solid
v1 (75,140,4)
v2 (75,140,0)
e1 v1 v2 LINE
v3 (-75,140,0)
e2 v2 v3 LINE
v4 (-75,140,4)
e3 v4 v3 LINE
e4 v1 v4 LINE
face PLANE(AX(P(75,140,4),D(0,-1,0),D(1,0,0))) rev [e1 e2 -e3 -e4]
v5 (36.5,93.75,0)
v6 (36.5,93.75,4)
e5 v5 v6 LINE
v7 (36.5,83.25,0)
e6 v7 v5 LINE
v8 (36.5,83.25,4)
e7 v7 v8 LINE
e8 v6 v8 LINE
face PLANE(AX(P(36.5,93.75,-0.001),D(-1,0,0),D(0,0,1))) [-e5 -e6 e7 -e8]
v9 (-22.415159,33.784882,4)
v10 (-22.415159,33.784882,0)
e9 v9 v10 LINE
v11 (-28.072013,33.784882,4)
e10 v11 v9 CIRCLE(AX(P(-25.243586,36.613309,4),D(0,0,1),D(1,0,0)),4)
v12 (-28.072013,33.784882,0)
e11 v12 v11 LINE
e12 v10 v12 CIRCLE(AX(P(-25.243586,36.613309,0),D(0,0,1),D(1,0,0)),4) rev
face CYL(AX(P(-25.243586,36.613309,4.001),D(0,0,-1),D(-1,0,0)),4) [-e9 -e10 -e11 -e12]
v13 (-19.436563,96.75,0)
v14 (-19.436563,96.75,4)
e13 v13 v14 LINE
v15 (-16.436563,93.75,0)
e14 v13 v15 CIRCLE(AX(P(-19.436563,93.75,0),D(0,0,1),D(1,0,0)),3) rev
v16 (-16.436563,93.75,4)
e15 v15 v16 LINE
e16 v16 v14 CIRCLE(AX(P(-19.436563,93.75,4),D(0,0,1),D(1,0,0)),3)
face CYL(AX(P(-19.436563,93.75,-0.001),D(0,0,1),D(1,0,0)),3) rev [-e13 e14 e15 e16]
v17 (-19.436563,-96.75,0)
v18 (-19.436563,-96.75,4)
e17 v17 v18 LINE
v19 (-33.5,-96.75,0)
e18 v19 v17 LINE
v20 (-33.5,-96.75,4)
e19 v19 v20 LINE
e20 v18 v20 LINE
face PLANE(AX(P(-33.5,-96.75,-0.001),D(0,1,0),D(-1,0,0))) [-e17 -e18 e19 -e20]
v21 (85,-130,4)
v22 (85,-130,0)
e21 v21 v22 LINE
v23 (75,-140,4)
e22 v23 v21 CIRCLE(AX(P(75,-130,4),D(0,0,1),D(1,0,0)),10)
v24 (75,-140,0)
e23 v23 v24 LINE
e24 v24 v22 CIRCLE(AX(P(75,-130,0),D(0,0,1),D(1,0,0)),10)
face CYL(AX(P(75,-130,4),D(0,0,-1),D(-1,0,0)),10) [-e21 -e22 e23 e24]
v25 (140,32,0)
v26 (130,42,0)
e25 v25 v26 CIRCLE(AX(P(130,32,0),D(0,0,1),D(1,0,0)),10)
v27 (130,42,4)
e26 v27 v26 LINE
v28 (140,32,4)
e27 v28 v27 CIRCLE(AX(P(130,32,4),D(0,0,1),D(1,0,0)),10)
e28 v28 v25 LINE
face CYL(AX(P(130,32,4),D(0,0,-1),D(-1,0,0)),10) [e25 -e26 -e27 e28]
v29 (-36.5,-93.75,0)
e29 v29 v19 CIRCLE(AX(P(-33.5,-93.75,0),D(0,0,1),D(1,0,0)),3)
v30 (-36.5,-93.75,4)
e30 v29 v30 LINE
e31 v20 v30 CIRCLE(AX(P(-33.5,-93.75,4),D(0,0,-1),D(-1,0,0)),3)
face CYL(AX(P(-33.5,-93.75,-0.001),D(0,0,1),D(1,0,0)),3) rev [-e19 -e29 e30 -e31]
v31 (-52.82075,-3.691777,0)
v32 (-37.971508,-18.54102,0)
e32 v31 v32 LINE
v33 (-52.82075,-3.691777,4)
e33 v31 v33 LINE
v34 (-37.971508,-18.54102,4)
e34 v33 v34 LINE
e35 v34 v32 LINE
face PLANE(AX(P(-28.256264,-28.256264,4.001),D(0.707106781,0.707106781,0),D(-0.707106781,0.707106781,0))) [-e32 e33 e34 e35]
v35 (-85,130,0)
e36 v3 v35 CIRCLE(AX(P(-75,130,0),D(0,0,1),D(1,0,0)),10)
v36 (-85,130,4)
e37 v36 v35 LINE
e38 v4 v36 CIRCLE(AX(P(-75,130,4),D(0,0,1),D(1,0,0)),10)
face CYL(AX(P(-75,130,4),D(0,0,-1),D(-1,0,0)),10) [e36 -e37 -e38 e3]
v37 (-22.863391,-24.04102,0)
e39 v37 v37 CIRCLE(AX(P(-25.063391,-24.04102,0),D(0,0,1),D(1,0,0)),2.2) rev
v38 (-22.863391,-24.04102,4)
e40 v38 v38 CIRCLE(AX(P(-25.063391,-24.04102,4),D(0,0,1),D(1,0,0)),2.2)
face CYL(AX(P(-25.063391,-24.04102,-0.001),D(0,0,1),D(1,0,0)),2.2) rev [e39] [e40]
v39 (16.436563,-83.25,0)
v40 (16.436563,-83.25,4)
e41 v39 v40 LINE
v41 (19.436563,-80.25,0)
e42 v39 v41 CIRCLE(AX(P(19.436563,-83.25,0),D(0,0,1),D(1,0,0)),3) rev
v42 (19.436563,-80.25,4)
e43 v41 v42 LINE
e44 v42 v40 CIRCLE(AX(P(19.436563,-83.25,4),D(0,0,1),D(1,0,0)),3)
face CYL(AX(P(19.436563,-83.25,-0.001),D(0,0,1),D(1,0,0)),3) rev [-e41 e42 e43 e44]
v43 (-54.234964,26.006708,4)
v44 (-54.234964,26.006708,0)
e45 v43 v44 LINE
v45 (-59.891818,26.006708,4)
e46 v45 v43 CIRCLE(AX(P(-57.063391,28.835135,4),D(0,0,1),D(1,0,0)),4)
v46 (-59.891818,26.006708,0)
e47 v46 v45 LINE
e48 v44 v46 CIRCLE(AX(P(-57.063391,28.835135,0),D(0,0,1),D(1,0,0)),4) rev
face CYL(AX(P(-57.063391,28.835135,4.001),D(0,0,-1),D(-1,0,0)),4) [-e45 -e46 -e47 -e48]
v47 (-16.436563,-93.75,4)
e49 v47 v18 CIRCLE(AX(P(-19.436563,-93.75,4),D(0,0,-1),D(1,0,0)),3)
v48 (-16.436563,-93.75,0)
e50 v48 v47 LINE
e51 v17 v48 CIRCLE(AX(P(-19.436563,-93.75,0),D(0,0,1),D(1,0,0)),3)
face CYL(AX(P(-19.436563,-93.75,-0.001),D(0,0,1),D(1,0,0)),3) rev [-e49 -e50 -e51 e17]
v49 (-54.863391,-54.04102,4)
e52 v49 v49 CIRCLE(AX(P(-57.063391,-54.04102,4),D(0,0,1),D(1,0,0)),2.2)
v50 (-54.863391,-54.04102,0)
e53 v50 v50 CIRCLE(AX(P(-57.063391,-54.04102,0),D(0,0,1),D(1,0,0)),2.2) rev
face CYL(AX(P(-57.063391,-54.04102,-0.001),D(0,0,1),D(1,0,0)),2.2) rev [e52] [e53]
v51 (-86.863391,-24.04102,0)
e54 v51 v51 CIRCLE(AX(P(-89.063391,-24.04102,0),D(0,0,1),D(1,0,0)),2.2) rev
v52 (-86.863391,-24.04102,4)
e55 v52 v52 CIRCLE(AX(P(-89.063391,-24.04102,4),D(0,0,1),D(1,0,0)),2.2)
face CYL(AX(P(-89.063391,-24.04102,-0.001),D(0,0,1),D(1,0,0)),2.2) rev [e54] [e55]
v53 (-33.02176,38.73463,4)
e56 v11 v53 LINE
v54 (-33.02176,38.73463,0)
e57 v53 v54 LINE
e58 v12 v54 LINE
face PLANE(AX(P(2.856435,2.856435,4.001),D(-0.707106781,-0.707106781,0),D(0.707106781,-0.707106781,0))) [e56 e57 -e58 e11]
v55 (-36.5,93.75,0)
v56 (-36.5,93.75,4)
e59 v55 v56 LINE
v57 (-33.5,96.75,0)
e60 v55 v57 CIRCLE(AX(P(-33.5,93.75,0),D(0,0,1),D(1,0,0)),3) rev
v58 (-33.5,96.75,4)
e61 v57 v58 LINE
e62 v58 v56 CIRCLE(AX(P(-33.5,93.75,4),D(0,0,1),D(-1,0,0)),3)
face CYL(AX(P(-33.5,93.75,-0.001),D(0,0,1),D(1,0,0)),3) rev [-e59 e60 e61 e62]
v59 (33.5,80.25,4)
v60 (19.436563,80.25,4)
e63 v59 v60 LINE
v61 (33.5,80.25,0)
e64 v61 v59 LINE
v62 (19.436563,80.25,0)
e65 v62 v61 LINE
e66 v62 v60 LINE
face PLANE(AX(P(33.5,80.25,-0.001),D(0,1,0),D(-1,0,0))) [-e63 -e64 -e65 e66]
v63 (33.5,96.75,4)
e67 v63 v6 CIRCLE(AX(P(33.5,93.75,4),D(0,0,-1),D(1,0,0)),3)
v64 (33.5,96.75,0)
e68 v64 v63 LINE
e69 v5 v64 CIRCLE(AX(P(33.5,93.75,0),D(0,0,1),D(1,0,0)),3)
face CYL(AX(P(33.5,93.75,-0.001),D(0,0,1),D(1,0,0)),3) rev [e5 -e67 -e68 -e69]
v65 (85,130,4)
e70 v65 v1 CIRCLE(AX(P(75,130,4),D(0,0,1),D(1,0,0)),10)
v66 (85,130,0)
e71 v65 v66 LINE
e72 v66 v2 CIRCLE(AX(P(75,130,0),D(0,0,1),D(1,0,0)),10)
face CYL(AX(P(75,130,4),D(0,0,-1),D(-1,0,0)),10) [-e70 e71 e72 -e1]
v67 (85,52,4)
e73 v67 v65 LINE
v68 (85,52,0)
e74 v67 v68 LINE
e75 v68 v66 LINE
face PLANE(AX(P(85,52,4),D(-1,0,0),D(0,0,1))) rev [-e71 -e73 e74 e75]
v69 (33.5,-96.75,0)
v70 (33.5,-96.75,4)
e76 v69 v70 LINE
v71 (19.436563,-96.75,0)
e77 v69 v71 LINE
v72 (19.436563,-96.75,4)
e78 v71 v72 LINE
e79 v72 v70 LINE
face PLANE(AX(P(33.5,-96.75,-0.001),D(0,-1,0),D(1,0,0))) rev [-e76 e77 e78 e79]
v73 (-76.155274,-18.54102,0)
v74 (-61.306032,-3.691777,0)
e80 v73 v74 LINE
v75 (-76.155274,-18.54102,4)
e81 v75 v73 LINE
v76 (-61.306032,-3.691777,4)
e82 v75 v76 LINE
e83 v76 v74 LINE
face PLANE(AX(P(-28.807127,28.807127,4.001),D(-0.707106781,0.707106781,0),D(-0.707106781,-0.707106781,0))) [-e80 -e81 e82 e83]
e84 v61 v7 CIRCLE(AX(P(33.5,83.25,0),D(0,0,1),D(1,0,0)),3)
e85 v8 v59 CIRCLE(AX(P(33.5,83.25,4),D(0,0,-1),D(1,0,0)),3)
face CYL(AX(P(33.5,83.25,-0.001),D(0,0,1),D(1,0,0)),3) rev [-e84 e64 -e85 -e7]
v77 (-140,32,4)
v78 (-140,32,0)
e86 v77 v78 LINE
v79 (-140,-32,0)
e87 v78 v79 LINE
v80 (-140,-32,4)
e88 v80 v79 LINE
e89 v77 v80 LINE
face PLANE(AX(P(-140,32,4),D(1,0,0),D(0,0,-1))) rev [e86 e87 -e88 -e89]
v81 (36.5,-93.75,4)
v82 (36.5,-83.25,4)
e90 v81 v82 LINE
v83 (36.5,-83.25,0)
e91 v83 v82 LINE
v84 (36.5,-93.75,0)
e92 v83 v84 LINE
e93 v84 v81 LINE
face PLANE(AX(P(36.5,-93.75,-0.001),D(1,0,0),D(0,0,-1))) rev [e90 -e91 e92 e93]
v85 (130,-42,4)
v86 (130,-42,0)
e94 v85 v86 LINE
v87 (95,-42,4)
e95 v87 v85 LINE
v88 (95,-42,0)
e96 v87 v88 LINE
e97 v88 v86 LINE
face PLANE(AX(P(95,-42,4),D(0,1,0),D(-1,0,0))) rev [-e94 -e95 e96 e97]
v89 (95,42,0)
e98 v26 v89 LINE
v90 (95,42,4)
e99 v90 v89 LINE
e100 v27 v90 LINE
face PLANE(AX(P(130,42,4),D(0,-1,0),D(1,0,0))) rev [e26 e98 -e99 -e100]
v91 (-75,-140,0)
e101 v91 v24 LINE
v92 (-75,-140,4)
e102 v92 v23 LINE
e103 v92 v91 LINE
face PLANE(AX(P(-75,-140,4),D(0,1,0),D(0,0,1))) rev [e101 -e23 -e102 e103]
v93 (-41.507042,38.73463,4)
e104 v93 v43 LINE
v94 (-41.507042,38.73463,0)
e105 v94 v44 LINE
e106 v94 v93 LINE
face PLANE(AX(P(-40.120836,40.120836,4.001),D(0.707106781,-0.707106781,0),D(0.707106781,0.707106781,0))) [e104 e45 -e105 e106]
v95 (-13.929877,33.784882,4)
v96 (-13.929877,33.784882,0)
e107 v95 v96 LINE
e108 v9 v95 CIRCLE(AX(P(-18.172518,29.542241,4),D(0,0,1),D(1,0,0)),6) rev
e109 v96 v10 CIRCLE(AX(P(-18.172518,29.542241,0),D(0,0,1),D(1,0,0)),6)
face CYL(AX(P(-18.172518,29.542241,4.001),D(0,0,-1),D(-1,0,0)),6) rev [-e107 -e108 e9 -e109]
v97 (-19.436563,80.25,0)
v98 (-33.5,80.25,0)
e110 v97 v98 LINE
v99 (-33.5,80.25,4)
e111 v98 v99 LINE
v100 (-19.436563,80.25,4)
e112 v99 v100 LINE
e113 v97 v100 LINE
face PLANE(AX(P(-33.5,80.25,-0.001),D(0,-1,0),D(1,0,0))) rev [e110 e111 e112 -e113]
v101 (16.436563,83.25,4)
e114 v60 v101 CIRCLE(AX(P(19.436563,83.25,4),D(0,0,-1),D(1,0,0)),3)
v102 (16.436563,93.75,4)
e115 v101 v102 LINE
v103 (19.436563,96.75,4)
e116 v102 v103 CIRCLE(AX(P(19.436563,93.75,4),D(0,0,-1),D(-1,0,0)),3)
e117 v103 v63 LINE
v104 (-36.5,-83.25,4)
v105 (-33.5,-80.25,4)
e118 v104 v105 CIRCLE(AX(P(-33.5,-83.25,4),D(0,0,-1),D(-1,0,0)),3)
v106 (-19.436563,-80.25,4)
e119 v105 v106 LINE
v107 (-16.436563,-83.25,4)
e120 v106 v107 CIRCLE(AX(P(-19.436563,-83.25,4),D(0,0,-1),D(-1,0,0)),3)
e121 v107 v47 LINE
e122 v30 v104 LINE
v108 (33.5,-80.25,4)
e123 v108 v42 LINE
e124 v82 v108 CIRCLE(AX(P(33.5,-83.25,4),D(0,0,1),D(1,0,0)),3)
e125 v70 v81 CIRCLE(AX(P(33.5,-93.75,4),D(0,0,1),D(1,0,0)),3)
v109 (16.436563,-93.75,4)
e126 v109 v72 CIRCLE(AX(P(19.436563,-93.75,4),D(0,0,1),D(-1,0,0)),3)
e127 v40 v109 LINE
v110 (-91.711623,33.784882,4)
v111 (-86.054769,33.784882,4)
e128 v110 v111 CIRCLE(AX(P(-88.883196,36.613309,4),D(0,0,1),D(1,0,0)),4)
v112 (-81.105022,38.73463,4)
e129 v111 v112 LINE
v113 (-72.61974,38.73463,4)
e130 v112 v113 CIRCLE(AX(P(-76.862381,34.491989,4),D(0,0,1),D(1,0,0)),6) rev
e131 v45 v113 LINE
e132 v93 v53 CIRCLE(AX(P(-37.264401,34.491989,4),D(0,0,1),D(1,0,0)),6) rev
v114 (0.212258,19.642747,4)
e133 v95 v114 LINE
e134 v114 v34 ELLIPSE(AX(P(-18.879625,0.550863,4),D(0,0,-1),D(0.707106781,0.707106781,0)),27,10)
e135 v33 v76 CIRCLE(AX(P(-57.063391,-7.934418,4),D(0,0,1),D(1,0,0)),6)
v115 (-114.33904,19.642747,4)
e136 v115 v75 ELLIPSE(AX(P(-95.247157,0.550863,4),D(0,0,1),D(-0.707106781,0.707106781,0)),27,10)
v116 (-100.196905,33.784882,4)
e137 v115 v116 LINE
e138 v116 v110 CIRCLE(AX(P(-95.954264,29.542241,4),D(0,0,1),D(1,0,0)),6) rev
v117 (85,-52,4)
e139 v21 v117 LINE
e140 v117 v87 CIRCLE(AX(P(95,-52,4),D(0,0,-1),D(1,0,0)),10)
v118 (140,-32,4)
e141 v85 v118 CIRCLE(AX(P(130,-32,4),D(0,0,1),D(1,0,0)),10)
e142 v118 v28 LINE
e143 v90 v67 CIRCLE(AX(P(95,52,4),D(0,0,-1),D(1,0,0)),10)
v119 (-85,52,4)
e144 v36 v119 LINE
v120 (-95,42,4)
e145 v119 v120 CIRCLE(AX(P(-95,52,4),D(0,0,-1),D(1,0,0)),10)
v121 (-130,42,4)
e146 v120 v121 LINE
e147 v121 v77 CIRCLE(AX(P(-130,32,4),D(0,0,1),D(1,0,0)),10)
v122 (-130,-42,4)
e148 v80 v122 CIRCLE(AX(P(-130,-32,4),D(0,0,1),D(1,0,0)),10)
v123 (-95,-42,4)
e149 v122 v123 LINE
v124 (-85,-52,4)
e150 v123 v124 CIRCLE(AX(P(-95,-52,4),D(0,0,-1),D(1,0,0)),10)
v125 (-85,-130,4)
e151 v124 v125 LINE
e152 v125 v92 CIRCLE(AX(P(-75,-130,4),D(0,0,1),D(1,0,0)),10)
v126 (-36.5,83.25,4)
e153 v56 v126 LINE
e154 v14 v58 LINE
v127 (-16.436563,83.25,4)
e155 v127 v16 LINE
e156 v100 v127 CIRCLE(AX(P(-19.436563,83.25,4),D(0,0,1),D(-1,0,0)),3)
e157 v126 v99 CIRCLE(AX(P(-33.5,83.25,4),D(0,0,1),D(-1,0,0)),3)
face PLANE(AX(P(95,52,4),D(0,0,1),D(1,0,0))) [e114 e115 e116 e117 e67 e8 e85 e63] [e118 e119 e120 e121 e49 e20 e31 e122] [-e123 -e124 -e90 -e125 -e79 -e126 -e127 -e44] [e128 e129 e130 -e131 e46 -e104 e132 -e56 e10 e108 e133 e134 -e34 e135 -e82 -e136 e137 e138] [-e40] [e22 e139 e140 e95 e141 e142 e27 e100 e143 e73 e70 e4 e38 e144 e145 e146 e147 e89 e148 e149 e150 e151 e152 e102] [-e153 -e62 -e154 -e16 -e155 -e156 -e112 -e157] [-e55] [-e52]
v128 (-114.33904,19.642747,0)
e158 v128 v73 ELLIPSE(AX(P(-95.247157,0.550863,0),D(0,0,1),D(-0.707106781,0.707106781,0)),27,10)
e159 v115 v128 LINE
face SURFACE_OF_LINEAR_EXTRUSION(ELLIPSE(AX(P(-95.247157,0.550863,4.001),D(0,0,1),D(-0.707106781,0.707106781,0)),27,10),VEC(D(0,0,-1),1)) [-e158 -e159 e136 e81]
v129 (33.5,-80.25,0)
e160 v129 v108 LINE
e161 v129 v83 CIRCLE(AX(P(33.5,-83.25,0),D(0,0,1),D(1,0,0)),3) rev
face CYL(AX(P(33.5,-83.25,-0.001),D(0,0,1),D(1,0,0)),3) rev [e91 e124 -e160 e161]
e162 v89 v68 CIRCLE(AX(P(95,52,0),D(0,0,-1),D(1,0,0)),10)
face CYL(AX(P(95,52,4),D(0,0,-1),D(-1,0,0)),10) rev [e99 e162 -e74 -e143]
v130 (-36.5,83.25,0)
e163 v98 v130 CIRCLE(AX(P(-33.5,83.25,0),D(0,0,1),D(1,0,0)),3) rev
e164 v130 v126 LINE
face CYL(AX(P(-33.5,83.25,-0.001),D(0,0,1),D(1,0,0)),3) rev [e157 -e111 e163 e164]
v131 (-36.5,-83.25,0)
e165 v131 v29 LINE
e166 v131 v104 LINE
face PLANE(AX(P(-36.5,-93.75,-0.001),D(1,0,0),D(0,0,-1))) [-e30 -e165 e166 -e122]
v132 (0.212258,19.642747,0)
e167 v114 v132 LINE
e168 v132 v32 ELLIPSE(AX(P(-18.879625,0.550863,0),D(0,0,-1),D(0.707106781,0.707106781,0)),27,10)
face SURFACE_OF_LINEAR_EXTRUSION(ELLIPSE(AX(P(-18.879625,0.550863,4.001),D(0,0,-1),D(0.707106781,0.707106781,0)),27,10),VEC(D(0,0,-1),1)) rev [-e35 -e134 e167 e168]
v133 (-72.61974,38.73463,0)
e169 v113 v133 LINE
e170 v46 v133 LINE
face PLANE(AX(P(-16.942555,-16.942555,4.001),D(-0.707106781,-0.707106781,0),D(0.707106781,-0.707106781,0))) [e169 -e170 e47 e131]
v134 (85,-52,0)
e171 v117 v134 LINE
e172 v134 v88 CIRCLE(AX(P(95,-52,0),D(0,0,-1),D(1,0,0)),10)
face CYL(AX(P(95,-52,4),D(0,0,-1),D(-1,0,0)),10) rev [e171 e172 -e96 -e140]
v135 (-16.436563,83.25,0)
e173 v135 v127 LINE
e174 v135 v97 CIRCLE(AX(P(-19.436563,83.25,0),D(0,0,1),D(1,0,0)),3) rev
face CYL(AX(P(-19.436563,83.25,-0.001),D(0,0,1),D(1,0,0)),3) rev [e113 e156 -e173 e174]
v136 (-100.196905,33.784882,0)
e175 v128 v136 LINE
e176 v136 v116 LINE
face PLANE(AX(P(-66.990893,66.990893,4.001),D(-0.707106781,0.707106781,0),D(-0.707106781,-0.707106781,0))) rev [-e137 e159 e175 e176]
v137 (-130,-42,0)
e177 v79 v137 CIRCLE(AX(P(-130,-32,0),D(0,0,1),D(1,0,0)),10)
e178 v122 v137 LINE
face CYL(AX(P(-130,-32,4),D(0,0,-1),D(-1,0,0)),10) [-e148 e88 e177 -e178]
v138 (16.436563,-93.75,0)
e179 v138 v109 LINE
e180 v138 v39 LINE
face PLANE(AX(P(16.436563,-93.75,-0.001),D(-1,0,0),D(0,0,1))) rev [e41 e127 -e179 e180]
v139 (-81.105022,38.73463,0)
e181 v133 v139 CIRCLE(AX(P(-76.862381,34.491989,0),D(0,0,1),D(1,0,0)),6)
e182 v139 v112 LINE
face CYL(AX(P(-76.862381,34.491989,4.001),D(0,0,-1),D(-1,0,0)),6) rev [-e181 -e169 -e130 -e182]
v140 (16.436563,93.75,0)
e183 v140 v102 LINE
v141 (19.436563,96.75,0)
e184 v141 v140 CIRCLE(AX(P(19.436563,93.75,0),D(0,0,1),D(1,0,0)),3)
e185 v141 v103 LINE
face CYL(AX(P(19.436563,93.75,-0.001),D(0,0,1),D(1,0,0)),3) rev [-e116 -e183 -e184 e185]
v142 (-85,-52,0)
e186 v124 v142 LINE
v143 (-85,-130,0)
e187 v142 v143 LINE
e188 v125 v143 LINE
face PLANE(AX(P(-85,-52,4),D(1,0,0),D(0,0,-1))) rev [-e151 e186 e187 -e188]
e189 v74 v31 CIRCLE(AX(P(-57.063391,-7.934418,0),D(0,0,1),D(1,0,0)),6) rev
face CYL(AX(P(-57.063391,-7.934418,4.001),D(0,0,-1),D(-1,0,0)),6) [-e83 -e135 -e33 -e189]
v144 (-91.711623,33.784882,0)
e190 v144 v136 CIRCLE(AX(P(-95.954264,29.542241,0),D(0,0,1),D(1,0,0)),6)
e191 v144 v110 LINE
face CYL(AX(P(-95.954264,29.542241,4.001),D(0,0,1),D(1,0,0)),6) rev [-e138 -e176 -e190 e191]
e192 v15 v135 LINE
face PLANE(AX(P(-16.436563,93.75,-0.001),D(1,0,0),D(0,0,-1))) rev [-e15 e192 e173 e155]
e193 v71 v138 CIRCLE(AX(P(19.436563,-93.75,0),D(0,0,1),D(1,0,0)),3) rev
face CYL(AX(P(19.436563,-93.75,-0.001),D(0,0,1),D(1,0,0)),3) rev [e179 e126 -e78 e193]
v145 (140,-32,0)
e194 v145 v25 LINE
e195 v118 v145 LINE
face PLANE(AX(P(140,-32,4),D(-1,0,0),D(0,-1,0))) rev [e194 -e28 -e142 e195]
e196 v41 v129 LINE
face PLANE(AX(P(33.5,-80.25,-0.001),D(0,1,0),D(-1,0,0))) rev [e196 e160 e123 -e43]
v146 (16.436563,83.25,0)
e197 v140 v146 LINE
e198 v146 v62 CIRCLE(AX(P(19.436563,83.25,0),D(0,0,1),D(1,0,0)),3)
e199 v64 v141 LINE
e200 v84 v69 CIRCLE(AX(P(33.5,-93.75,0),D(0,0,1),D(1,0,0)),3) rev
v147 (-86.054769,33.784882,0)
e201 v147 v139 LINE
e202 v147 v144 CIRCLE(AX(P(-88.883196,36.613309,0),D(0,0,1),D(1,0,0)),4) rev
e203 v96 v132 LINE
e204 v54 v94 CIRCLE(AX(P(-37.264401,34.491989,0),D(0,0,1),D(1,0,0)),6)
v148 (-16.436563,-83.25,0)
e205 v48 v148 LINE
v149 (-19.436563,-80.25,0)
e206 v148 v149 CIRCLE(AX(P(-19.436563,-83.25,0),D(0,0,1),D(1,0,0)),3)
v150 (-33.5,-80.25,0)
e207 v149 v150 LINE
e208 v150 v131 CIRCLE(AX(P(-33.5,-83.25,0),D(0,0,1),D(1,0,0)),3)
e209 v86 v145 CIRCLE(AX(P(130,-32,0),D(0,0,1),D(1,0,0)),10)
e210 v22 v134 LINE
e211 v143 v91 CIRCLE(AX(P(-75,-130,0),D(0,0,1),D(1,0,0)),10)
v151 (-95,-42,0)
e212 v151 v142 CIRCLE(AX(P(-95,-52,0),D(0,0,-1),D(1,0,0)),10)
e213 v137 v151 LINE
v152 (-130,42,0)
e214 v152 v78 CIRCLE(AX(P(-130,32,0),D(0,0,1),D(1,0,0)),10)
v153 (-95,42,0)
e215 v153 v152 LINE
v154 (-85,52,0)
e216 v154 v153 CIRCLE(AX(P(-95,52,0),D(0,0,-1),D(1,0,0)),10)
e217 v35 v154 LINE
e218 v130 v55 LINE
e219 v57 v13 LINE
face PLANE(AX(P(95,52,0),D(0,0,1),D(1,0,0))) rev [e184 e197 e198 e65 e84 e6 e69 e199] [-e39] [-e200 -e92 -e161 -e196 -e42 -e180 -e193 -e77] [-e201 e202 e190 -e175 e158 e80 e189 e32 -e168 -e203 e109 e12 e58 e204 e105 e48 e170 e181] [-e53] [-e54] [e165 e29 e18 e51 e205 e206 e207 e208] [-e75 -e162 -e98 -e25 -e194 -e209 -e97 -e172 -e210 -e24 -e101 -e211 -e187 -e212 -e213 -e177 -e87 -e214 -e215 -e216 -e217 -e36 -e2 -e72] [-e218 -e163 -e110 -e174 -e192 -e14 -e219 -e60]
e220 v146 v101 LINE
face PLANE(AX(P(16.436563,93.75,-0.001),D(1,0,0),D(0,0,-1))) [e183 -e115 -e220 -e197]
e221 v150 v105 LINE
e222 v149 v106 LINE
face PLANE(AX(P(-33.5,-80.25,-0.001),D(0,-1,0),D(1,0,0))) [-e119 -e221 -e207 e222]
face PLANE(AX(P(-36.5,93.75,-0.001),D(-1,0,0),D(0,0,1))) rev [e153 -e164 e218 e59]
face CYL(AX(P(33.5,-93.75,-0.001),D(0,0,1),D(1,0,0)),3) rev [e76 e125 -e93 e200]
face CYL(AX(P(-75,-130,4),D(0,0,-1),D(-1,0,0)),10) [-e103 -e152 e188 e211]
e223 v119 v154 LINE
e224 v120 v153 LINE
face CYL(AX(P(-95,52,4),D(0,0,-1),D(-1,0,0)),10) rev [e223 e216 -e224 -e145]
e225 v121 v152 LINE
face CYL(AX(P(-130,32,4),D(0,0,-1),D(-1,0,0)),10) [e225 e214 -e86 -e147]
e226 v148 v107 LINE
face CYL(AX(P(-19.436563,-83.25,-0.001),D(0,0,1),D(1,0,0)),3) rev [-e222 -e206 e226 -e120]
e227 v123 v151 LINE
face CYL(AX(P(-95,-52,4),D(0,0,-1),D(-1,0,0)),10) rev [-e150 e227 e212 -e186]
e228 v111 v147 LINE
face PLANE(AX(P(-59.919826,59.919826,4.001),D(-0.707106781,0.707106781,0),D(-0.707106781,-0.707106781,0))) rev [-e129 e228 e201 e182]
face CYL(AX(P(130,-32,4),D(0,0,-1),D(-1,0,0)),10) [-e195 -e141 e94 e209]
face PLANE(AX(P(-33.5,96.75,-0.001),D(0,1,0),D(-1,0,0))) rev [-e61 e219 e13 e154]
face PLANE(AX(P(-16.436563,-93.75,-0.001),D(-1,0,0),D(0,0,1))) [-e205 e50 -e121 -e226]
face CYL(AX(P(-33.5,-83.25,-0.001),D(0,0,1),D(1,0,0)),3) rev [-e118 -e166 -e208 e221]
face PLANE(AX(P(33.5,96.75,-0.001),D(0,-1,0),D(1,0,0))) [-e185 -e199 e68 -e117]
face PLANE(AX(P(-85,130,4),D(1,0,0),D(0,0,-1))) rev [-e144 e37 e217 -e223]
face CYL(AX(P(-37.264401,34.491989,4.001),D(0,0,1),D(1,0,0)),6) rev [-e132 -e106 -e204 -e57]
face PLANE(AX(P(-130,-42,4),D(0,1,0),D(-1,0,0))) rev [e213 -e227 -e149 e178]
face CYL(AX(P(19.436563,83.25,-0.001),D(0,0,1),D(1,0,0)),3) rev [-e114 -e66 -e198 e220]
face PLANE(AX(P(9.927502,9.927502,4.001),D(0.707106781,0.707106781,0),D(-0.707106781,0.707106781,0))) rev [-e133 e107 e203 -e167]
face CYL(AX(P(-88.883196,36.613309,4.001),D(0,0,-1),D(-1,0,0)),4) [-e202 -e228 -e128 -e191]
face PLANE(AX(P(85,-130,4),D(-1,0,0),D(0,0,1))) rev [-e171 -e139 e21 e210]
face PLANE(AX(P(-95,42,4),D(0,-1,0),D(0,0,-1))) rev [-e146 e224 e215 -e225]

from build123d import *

# Parameters (mm, degrees)
EXTRUDE_1_DEPTH                           = 4
CUT_EXTRUDE_1_REACH                       = 200.03
MIRROR_1_AT_THE_SECOND_PLANE_COPY_1_REACH = 200.03
CUT_EXTRUDE_2_REACH                       = 200.03
FILLET_1_R                                = 4
FILLET_2_R                                = 6
CUT_EXTRUDE_3_REACH                       = 200.03
SKETCH_7_R                                = 2.2


with BuildPart() as part:
    # 草图1 → 凸台-拉伸1 (new body)
    with BuildSketch(Plane.XY):
        with BuildLine():
            Line((85, 52), (85, 130))
            ThreePointArc((85, 130), (82.071067812, 137.071067812), (75, 140))
            Line((75, 140), (-75, 140))
            ThreePointArc((-75, 140), (-82.071067812, 137.071067812), (-85, 130))
            Line((-85, 130), (-85, 52))
            ThreePointArc((-85, 52), (-87.928932188, 44.928932188), (-95, 42))
            Line((-95, 42), (-130, 42))
            ThreePointArc((-130, 42), (-137.071067812, 39.071067812), (-140, 32))
            Line((-140, 32), (-140, -32))
            ThreePointArc((-140, -32), (-137.071067812, -39.071067812), (-130, -42))
            Line((-130, -42), (-95, -42))
            ThreePointArc((-95, -42), (-87.928932188, -44.928932188), (-85, -52))
            Line((-85, -52), (-85, -130))
            ThreePointArc((-85, -130), (-82.071067812, -137.071067812), (-75, -140))
            Line((-75, -140), (75, -140))
            ThreePointArc((75, -140), (82.071067812, -137.071067812), (85, -130))
            Line((85, -130), (85, -52))
            ThreePointArc((85, -52), (87.928932188, -44.928932188), (95, -42))
            Line((95, -42), (130, -42))
            ThreePointArc((130, -42), (137.071067812, -39.071067812), (140, -32))
            Line((140, -32), (140, 32))
            ThreePointArc((140, 32), (137.071067812, 39.071067812), (130, 42))
            Line((130, 42), (95, 42))
            ThreePointArc((95, 42), (87.928932188, 44.928932188), (85, 52))
        make_face()
    extrude(amount=EXTRUDE_1_DEPTH)

    # 草图2 → 切除-拉伸1 (cut, up to next)
    with BuildSketch(Plane.XY.offset(4), mode=Mode.PRIVATE) as cut_extrude_1_sk1:
        with BuildLine():
            Line((33.5, -96.75), (19.436562746, -96.75))
            ThreePointArc((19.436562746, -96.75), (17.315242402, -95.871320344), (16.436562746, -93.75))
            Line((16.436562746, -93.75), (16.436562746, -83.25))
            ThreePointArc((16.436562746, -83.25), (17.315242402, -81.128679656), (19.436562746, -80.25))
            Line((19.436562746, -80.25), (33.5, -80.25))
            ThreePointArc((33.5, -80.25), (35.621320344, -81.128679656), (36.5, -83.25))
            Line((36.5, -83.25), (36.5, -93.75))
            ThreePointArc((36.5, -93.75), (35.621320344, -95.871320344), (33.5, -96.75))
        make_face()
    cut_extrude_1_tool1 = extrude(cut_extrude_1_sk1.sketch, amount=-CUT_EXTRUDE_1_REACH, mode=Mode.PRIVATE) & part.part
    cut_extrude_1 = cut_extrude_1_tool1.solids().sort_by_distance((26.468281, -88.5, 4))[0]
    add(cut_extrude_1, mode=Mode.SUBTRACT)

    # 镜向1: 切除-拉伸1 across plane
    add(cut_extrude_1.mirror(Plane(origin=(0, 0, 0), x_dir=(0, 0, 1), z_dir=(1, 0, 0))), mode=Mode.SUBTRACT)

    # 镜向1 at the second plane: 切除-拉伸1 across plane
    add(cut_extrude_1.mirror(Plane.ZX), mode=Mode.SUBTRACT)

    # 镜向1 at the second plane copy 1 sket → 镜向1 at the second plane copy 1 (cut, up to next)
    with BuildSketch(Plane(origin=(0, 0, 4), x_dir=(-1, 0, 0), z_dir=(0, 0, 1)), mode=Mode.PRIVATE) as mirror_1_at_the_second_plane_copy_1_sk1:
        with BuildLine():
            Line((33.5, -96.75), (19.436562746, -96.75))
            ThreePointArc((19.436562746, -96.75), (17.315242402, -95.871320344), (16.436562746, -93.75))
            Line((16.436562746, -93.75), (16.436562746, -83.25))
            ThreePointArc((16.436562746, -83.25), (17.315242402, -81.128679656), (19.436562746, -80.25))
            Line((19.436562746, -80.25), (33.5, -80.25))
            ThreePointArc((33.5, -80.25), (35.621320344, -81.128679656), (36.5, -83.25))
            Line((36.5, -83.25), (36.5, -93.75))
            ThreePointArc((36.5, -93.75), (35.621320344, -95.871320344), (33.5, -96.75))
        make_face()
    mirror_1_at_the_second_plane_copy_1_tool1 = extrude(mirror_1_at_the_second_plane_copy_1_sk1.sketch, amount=-MIRROR_1_AT_THE_SECOND_PLANE_COPY_1_REACH, mode=Mode.PRIVATE) & part.part
    add(mirror_1_at_the_second_plane_copy_1_tool1.solids().sort_by_distance((-26.468281, 88.5, 4))[0], mode=Mode.SUBTRACT)

    # 草图6 → 切除-拉伸2 (cut, up to next)
    with BuildSketch(Plane(origin=(0, 0, 0), x_dir=(-1, 0, 0), z_dir=(0, 0, -1)), mode=Mode.PRIVATE) as cut_extrude_2_sk1:
        with BuildLine():
            Line((114.339040254, 19.642746522), (95.954263943, 38.027522832))
            Line((95.954263943, 38.027522832), (88.883196131, 30.956455021))
            Line((88.883196131, 30.956455021), (76.862380851, 42.977270301))
            Line((76.862380851, 42.977270301), (57.063390978, 23.178280428))
            Line((57.063390978, 23.178280428), (37.264401104, 42.977270301))
            Line((37.264401104, 42.977270301), (25.243585824, 30.956455021))
            Line((25.243585824, 30.956455021), (18.172518012, 38.027522832))
            Line((18.172518012, 38.027522832), (-0.212258298, 19.642746522))
            add(Edge.make_bspline(
                [(37.971507886, -18.541019662), (45.042575698, -11.469951851), (25.950692606, 7.621931241), (6.858809513, 26.713814333), (-0.212258298, 19.642746522)],
                knots=[3.141592654, 3.141592654, 3.141592654, 4.71238898, 4.71238898, 6.283185307, 6.283185307, 6.283185307], degree=2, weights=[1, 0.707106781, 1, 0.707106781, 1]))
            Line((37.971507886, -18.541019662), (57.063390978, 0.55086343))
            Line((57.063390978, 0.55086343), (76.15527407, -18.541019662))
            add(Edge.make_bspline(
                [(114.339040254, 19.642746522), (107.267972442, 26.713814333), (88.17608935, 7.621931241), (69.084206258, -11.469951851), (76.15527407, -18.541019662)],
                knots=[0, 0, 0, 1.570796327, 1.570796327, 3.141592654, 3.141592654, 3.141592654], degree=2, weights=[1, 0.707106781, 1, 0.707106781, 1]))
        make_face()
    cut_extrude_2_tool1 = extrude(cut_extrude_2_sk1.sketch, amount=-CUT_EXTRUDE_2_REACH, mode=Mode.PRIVATE) & part.part
    # 草图6 → 切除-拉伸2 (cut, up to next)
    with BuildSketch(Plane(origin=(0, 0, 0), x_dir=(-1, 0, 0), z_dir=(0, 0, -1)), mode=Mode.PRIVATE) as cut_extrude_2_sk2:
        with BuildLine():
            add(Edge.make_bspline(
                [(-0.212258298, 19.642746522), (-7.28332611, 12.57167871), (11.808556982, -6.520204382), (30.900440074, -25.612087474), (37.971507886, -18.541019662)],
                knots=[0, 0, 0, 1.570796327, 1.570796327, 3.141592654, 3.141592654, 3.141592654], degree=2, weights=[1, 0.707106781, 1, 0.707106781, 1]))
            Line((37.971507886, -18.541019662), (-0.212258298, 19.642746522))
        make_face()
    cut_extrude_2_tool2 = extrude(cut_extrude_2_sk2.sketch, amount=-CUT_EXTRUDE_2_REACH, mode=Mode.PRIVATE) & part.part
    # 草图6 → 切除-拉伸2 (cut, up to next)
    with BuildSketch(Plane(origin=(0, 0, 0), x_dir=(-1, 0, 0), z_dir=(0, 0, -1)), mode=Mode.PRIVATE) as cut_extrude_2_sk3:
        with BuildLine():
            Line((-0.212258298, 19.642746522), (37.971507886, -18.541019662))
            add(Edge.make_bspline(
                [(37.971507886, -18.541019662), (45.042575698, -11.469951851), (25.950692606, 7.621931241), (6.858809513, 26.713814333), (-0.212258298, 19.642746522)],
                knots=[3.141592654, 3.141592654, 3.141592654, 4.71238898, 4.71238898, 6.283185307, 6.283185307, 6.283185307], degree=2, weights=[1, 0.707106781, 1, 0.707106781, 1]))
        make_face()
    cut_extrude_2_tool3 = extrude(cut_extrude_2_sk3.sketch, amount=-CUT_EXTRUDE_2_REACH, mode=Mode.PRIVATE) & part.part
    # 草图6 → 切除-拉伸2 (cut, up to next)
    with BuildSketch(Plane(origin=(0, 0, 0), x_dir=(-1, 0, 0), z_dir=(0, 0, -1)), mode=Mode.PRIVATE) as cut_extrude_2_sk4:
        with BuildLine():
            add(Edge.make_bspline(
                [(-0.212258298, 19.642746522), (-7.28332611, 12.57167871), (11.808556982, -6.520204382), (30.900440074, -25.612087474), (37.971507886, -18.541019662)],
                knots=[0, 0, 0, 1.570796327, 1.570796327, 3.141592654, 3.141592654, 3.141592654], degree=2, weights=[1, 0.707106781, 1, 0.707106781, 1]))
            Line((37.971507886, -18.541019662), (-0.212258298, 19.642746522))
        make_face()
    cut_extrude_2_tool4 = extrude(cut_extrude_2_sk4.sketch, amount=-CUT_EXTRUDE_2_REACH, mode=Mode.PRIVATE) & part.part
    # 草图6 → 切除-拉伸2 (cut, up to next)
    with BuildSketch(Plane(origin=(0, 0, 0), x_dir=(-1, 0, 0), z_dir=(0, 0, -1)), mode=Mode.PRIVATE) as cut_extrude_2_sk5:
        with BuildLine():
            Line((-0.212258298, 19.642746522), (37.971507886, -18.541019662))
            add(Edge.make_bspline(
                [(37.971507886, -18.541019662), (45.042575698, -11.469951851), (25.950692606, 7.621931241), (6.858809513, 26.713814333), (-0.212258298, 19.642746522)],
                knots=[3.141592654, 3.141592654, 3.141592654, 4.71238898, 4.71238898, 6.283185307, 6.283185307, 6.283185307], degree=2, weights=[1, 0.707106781, 1, 0.707106781, 1]))
        make_face()
    cut_extrude_2_tool5 = extrude(cut_extrude_2_sk5.sketch, amount=-CUT_EXTRUDE_2_REACH, mode=Mode.PRIVATE) & part.part
    # 草图6 → 切除-拉伸2 (cut, up to next)
    with BuildSketch(Plane(origin=(0, 0, 0), x_dir=(-1, 0, 0), z_dir=(0, 0, -1)), mode=Mode.PRIVATE) as cut_extrude_2_sk6:
        with BuildLine():
            add(Edge.make_bspline(
                [(76.15527407, -18.541019662), (83.226341882, -25.612087474), (102.318224974, -6.520204382), (121.410108066, 12.57167871), (114.339040254, 19.642746522)],
                knots=[3.141592654, 3.141592654, 3.141592654, 4.71238898, 4.71238898, 6.283185307, 6.283185307, 6.283185307], degree=2, weights=[1, 0.707106781, 1, 0.707106781, 1]))
            Line((114.339040254, 19.642746522), (76.15527407, -18.541019662))
        make_face()
    cut_extrude_2_tool6 = extrude(cut_extrude_2_sk6.sketch, amount=-CUT_EXTRUDE_2_REACH, mode=Mode.PRIVATE) & part.part
    # 草图6 → 切除-拉伸2 (cut, up to next)
    with BuildSketch(Plane(origin=(0, 0, 0), x_dir=(-1, 0, 0), z_dir=(0, 0, -1)), mode=Mode.PRIVATE) as cut_extrude_2_sk7:
        with BuildLine():
            Line((76.15527407, -18.541019662), (114.339040254, 19.642746522))
            add(Edge.make_bspline(
                [(114.339040254, 19.642746522), (107.267972442, 26.713814333), (88.17608935, 7.621931241), (69.084206258, -11.469951851), (76.15527407, -18.541019662)],
                knots=[0, 0, 0, 1.570796327, 1.570796327, 3.141592654, 3.141592654, 3.141592654], degree=2, weights=[1, 0.707106781, 1, 0.707106781, 1]))
        make_face()
    cut_extrude_2_tool7 = extrude(cut_extrude_2_sk7.sketch, amount=-CUT_EXTRUDE_2_REACH, mode=Mode.PRIVATE) & part.part
    # 草图6 → 切除-拉伸2 (cut, up to next)
    with BuildSketch(Plane(origin=(0, 0, 0), x_dir=(-1, 0, 0), z_dir=(0, 0, -1)), mode=Mode.PRIVATE) as cut_extrude_2_sk8:
        with BuildLine():
            add(Edge.make_bspline(
                [(76.15527407, -18.541019662), (83.226341882, -25.612087474), (102.318224974, -6.520204382), (121.410108066, 12.57167871), (114.339040254, 19.642746522)],
                knots=[3.141592654, 3.141592654, 3.141592654, 4.71238898, 4.71238898, 6.283185307, 6.283185307, 6.283185307], degree=2, weights=[1, 0.707106781, 1, 0.707106781, 1]))
            Line((114.339040254, 19.642746522), (76.15527407, -18.541019662))
        make_face()
    cut_extrude_2_tool8 = extrude(cut_extrude_2_sk8.sketch, amount=-CUT_EXTRUDE_2_REACH, mode=Mode.PRIVATE) & part.part
    # 草图6 → 切除-拉伸2 (cut, up to next)
    with BuildSketch(Plane(origin=(0, 0, 0), x_dir=(-1, 0, 0), z_dir=(0, 0, -1)), mode=Mode.PRIVATE) as cut_extrude_2_sk9:
        with BuildLine():
            Line((76.15527407, -18.541019662), (114.339040254, 19.642746522))
            add(Edge.make_bspline(
                [(114.339040254, 19.642746522), (107.267972442, 26.713814333), (88.17608935, 7.621931241), (69.084206258, -11.469951851), (76.15527407, -18.541019662)],
                knots=[0, 0, 0, 1.570796327, 1.570796327, 3.141592654, 3.141592654, 3.141592654], degree=2, weights=[1, 0.707106781, 1, 0.707106781, 1]))
        make_face()
    cut_extrude_2_tool9 = extrude(cut_extrude_2_sk9.sketch, amount=-CUT_EXTRUDE_2_REACH, mode=Mode.PRIVATE) & part.part
    add(cut_extrude_2_tool1.solids().sort_by_distance((-57.063391, 16.654228, 0))[0], mode=Mode.SUBTRACT)
    add(cut_extrude_2_tool2.solids().sort_by_distance((-15.933802, -2.435893, 0))[0], mode=Mode.SUBTRACT)
    add(cut_extrude_2_tool3.solids().sort_by_distance((-21.830862, 3.579723, 0))[0], mode=Mode.SUBTRACT)
    add(cut_extrude_2_tool4.solids().sort_by_distance((-15.933802, -2.435893, 0))[0], mode=Mode.SUBTRACT)
    add(cut_extrude_2_tool5.solids().sort_by_distance((-21.830862, 3.579723, 0))[0], mode=Mode.SUBTRACT)
    add(cut_extrude_2_tool6.solids().sort_by_distance((-98.198394, -2.477996, 0))[0], mode=Mode.SUBTRACT)
    add(cut_extrude_2_tool7.solids().sort_by_distance((-92.301335, 3.53762, 0))[0], mode=Mode.SUBTRACT)
    add(cut_extrude_2_tool8.solids().sort_by_distance((-98.198394, -2.477996, 0))[0], mode=Mode.SUBTRACT)
    add(cut_extrude_2_tool9.solids().sort_by_distance((-92.301335, 3.53762, 0))[0], mode=Mode.SUBTRACT)

    # 圆角1
    fillet_1_edges = [part.edges().sort_by_distance(p)[0] for p in [
        (-25.243585824, 30.956455021, 2),
        (-57.063390978, 23.178280428, 2),
        (-88.883196131, 30.956455021, 2),
    ]]
    fillet(fillet_1_edges, radius=FILLET_1_R)

    # 圆角2
    fillet_2_edges = [part.edges().sort_by_distance(p)[0] for p in [
        (-57.063390978, 0.55086343, 2),
        (-18.172518012, 38.027522832, 2),
        (-76.862380851, 42.977270301, 2),
        (-37.264401104, 42.977270301, 2),
        (-95.954263943, 38.027522832, 2),
    ]]
    fillet(fillet_2_edges, radius=FILLET_2_R - 0.0001)  # a hair under: the kernel refuses the full size

    # 草图7 → 切除-拉伸3 (cut, up to next)
    with BuildSketch(Plane.XY.offset(4), mode=Mode.PRIVATE) as cut_extrude_3_sk1:
        with Locations((-89.063390978, -24.041019662)):
            Circle(SKETCH_7_R)
    cut_extrude_3_tool1 = extrude(cut_extrude_3_sk1.sketch, amount=-CUT_EXTRUDE_3_REACH, mode=Mode.PRIVATE) & part.part
    # 草图7 → 切除-拉伸3 (cut, up to next)
    with BuildSketch(Plane.XY.offset(4), mode=Mode.PRIVATE) as cut_extrude_3_sk2:
        with Locations((-57.063390978, -54.041019663)):
            Circle(SKETCH_7_R)
    cut_extrude_3_tool2 = extrude(cut_extrude_3_sk2.sketch, amount=-CUT_EXTRUDE_3_REACH, mode=Mode.PRIVATE) & part.part
    # 草图7 → 切除-拉伸3 (cut, up to next)
    with BuildSketch(Plane.XY.offset(4), mode=Mode.PRIVATE) as cut_extrude_3_sk3:
        with Locations((-25.063390978, -24.041019662)):
            Circle(SKETCH_7_R)
    cut_extrude_3_tool3 = extrude(cut_extrude_3_sk3.sketch, amount=-CUT_EXTRUDE_3_REACH, mode=Mode.PRIVATE) & part.part
    add(cut_extrude_3_tool1.solids().sort_by_distance((-89.063391, -24.04102, 4))[0], mode=Mode.SUBTRACT)
    add(cut_extrude_3_tool2.solids().sort_by_distance((-57.063391, -54.04102, 4))[0], mode=Mode.SUBTRACT)
    add(cut_extrude_3_tool3.solids().sort_by_distance((-25.063391, -24.04102, 4))[0], mode=Mode.SUBTRACT)


solid = part.part
